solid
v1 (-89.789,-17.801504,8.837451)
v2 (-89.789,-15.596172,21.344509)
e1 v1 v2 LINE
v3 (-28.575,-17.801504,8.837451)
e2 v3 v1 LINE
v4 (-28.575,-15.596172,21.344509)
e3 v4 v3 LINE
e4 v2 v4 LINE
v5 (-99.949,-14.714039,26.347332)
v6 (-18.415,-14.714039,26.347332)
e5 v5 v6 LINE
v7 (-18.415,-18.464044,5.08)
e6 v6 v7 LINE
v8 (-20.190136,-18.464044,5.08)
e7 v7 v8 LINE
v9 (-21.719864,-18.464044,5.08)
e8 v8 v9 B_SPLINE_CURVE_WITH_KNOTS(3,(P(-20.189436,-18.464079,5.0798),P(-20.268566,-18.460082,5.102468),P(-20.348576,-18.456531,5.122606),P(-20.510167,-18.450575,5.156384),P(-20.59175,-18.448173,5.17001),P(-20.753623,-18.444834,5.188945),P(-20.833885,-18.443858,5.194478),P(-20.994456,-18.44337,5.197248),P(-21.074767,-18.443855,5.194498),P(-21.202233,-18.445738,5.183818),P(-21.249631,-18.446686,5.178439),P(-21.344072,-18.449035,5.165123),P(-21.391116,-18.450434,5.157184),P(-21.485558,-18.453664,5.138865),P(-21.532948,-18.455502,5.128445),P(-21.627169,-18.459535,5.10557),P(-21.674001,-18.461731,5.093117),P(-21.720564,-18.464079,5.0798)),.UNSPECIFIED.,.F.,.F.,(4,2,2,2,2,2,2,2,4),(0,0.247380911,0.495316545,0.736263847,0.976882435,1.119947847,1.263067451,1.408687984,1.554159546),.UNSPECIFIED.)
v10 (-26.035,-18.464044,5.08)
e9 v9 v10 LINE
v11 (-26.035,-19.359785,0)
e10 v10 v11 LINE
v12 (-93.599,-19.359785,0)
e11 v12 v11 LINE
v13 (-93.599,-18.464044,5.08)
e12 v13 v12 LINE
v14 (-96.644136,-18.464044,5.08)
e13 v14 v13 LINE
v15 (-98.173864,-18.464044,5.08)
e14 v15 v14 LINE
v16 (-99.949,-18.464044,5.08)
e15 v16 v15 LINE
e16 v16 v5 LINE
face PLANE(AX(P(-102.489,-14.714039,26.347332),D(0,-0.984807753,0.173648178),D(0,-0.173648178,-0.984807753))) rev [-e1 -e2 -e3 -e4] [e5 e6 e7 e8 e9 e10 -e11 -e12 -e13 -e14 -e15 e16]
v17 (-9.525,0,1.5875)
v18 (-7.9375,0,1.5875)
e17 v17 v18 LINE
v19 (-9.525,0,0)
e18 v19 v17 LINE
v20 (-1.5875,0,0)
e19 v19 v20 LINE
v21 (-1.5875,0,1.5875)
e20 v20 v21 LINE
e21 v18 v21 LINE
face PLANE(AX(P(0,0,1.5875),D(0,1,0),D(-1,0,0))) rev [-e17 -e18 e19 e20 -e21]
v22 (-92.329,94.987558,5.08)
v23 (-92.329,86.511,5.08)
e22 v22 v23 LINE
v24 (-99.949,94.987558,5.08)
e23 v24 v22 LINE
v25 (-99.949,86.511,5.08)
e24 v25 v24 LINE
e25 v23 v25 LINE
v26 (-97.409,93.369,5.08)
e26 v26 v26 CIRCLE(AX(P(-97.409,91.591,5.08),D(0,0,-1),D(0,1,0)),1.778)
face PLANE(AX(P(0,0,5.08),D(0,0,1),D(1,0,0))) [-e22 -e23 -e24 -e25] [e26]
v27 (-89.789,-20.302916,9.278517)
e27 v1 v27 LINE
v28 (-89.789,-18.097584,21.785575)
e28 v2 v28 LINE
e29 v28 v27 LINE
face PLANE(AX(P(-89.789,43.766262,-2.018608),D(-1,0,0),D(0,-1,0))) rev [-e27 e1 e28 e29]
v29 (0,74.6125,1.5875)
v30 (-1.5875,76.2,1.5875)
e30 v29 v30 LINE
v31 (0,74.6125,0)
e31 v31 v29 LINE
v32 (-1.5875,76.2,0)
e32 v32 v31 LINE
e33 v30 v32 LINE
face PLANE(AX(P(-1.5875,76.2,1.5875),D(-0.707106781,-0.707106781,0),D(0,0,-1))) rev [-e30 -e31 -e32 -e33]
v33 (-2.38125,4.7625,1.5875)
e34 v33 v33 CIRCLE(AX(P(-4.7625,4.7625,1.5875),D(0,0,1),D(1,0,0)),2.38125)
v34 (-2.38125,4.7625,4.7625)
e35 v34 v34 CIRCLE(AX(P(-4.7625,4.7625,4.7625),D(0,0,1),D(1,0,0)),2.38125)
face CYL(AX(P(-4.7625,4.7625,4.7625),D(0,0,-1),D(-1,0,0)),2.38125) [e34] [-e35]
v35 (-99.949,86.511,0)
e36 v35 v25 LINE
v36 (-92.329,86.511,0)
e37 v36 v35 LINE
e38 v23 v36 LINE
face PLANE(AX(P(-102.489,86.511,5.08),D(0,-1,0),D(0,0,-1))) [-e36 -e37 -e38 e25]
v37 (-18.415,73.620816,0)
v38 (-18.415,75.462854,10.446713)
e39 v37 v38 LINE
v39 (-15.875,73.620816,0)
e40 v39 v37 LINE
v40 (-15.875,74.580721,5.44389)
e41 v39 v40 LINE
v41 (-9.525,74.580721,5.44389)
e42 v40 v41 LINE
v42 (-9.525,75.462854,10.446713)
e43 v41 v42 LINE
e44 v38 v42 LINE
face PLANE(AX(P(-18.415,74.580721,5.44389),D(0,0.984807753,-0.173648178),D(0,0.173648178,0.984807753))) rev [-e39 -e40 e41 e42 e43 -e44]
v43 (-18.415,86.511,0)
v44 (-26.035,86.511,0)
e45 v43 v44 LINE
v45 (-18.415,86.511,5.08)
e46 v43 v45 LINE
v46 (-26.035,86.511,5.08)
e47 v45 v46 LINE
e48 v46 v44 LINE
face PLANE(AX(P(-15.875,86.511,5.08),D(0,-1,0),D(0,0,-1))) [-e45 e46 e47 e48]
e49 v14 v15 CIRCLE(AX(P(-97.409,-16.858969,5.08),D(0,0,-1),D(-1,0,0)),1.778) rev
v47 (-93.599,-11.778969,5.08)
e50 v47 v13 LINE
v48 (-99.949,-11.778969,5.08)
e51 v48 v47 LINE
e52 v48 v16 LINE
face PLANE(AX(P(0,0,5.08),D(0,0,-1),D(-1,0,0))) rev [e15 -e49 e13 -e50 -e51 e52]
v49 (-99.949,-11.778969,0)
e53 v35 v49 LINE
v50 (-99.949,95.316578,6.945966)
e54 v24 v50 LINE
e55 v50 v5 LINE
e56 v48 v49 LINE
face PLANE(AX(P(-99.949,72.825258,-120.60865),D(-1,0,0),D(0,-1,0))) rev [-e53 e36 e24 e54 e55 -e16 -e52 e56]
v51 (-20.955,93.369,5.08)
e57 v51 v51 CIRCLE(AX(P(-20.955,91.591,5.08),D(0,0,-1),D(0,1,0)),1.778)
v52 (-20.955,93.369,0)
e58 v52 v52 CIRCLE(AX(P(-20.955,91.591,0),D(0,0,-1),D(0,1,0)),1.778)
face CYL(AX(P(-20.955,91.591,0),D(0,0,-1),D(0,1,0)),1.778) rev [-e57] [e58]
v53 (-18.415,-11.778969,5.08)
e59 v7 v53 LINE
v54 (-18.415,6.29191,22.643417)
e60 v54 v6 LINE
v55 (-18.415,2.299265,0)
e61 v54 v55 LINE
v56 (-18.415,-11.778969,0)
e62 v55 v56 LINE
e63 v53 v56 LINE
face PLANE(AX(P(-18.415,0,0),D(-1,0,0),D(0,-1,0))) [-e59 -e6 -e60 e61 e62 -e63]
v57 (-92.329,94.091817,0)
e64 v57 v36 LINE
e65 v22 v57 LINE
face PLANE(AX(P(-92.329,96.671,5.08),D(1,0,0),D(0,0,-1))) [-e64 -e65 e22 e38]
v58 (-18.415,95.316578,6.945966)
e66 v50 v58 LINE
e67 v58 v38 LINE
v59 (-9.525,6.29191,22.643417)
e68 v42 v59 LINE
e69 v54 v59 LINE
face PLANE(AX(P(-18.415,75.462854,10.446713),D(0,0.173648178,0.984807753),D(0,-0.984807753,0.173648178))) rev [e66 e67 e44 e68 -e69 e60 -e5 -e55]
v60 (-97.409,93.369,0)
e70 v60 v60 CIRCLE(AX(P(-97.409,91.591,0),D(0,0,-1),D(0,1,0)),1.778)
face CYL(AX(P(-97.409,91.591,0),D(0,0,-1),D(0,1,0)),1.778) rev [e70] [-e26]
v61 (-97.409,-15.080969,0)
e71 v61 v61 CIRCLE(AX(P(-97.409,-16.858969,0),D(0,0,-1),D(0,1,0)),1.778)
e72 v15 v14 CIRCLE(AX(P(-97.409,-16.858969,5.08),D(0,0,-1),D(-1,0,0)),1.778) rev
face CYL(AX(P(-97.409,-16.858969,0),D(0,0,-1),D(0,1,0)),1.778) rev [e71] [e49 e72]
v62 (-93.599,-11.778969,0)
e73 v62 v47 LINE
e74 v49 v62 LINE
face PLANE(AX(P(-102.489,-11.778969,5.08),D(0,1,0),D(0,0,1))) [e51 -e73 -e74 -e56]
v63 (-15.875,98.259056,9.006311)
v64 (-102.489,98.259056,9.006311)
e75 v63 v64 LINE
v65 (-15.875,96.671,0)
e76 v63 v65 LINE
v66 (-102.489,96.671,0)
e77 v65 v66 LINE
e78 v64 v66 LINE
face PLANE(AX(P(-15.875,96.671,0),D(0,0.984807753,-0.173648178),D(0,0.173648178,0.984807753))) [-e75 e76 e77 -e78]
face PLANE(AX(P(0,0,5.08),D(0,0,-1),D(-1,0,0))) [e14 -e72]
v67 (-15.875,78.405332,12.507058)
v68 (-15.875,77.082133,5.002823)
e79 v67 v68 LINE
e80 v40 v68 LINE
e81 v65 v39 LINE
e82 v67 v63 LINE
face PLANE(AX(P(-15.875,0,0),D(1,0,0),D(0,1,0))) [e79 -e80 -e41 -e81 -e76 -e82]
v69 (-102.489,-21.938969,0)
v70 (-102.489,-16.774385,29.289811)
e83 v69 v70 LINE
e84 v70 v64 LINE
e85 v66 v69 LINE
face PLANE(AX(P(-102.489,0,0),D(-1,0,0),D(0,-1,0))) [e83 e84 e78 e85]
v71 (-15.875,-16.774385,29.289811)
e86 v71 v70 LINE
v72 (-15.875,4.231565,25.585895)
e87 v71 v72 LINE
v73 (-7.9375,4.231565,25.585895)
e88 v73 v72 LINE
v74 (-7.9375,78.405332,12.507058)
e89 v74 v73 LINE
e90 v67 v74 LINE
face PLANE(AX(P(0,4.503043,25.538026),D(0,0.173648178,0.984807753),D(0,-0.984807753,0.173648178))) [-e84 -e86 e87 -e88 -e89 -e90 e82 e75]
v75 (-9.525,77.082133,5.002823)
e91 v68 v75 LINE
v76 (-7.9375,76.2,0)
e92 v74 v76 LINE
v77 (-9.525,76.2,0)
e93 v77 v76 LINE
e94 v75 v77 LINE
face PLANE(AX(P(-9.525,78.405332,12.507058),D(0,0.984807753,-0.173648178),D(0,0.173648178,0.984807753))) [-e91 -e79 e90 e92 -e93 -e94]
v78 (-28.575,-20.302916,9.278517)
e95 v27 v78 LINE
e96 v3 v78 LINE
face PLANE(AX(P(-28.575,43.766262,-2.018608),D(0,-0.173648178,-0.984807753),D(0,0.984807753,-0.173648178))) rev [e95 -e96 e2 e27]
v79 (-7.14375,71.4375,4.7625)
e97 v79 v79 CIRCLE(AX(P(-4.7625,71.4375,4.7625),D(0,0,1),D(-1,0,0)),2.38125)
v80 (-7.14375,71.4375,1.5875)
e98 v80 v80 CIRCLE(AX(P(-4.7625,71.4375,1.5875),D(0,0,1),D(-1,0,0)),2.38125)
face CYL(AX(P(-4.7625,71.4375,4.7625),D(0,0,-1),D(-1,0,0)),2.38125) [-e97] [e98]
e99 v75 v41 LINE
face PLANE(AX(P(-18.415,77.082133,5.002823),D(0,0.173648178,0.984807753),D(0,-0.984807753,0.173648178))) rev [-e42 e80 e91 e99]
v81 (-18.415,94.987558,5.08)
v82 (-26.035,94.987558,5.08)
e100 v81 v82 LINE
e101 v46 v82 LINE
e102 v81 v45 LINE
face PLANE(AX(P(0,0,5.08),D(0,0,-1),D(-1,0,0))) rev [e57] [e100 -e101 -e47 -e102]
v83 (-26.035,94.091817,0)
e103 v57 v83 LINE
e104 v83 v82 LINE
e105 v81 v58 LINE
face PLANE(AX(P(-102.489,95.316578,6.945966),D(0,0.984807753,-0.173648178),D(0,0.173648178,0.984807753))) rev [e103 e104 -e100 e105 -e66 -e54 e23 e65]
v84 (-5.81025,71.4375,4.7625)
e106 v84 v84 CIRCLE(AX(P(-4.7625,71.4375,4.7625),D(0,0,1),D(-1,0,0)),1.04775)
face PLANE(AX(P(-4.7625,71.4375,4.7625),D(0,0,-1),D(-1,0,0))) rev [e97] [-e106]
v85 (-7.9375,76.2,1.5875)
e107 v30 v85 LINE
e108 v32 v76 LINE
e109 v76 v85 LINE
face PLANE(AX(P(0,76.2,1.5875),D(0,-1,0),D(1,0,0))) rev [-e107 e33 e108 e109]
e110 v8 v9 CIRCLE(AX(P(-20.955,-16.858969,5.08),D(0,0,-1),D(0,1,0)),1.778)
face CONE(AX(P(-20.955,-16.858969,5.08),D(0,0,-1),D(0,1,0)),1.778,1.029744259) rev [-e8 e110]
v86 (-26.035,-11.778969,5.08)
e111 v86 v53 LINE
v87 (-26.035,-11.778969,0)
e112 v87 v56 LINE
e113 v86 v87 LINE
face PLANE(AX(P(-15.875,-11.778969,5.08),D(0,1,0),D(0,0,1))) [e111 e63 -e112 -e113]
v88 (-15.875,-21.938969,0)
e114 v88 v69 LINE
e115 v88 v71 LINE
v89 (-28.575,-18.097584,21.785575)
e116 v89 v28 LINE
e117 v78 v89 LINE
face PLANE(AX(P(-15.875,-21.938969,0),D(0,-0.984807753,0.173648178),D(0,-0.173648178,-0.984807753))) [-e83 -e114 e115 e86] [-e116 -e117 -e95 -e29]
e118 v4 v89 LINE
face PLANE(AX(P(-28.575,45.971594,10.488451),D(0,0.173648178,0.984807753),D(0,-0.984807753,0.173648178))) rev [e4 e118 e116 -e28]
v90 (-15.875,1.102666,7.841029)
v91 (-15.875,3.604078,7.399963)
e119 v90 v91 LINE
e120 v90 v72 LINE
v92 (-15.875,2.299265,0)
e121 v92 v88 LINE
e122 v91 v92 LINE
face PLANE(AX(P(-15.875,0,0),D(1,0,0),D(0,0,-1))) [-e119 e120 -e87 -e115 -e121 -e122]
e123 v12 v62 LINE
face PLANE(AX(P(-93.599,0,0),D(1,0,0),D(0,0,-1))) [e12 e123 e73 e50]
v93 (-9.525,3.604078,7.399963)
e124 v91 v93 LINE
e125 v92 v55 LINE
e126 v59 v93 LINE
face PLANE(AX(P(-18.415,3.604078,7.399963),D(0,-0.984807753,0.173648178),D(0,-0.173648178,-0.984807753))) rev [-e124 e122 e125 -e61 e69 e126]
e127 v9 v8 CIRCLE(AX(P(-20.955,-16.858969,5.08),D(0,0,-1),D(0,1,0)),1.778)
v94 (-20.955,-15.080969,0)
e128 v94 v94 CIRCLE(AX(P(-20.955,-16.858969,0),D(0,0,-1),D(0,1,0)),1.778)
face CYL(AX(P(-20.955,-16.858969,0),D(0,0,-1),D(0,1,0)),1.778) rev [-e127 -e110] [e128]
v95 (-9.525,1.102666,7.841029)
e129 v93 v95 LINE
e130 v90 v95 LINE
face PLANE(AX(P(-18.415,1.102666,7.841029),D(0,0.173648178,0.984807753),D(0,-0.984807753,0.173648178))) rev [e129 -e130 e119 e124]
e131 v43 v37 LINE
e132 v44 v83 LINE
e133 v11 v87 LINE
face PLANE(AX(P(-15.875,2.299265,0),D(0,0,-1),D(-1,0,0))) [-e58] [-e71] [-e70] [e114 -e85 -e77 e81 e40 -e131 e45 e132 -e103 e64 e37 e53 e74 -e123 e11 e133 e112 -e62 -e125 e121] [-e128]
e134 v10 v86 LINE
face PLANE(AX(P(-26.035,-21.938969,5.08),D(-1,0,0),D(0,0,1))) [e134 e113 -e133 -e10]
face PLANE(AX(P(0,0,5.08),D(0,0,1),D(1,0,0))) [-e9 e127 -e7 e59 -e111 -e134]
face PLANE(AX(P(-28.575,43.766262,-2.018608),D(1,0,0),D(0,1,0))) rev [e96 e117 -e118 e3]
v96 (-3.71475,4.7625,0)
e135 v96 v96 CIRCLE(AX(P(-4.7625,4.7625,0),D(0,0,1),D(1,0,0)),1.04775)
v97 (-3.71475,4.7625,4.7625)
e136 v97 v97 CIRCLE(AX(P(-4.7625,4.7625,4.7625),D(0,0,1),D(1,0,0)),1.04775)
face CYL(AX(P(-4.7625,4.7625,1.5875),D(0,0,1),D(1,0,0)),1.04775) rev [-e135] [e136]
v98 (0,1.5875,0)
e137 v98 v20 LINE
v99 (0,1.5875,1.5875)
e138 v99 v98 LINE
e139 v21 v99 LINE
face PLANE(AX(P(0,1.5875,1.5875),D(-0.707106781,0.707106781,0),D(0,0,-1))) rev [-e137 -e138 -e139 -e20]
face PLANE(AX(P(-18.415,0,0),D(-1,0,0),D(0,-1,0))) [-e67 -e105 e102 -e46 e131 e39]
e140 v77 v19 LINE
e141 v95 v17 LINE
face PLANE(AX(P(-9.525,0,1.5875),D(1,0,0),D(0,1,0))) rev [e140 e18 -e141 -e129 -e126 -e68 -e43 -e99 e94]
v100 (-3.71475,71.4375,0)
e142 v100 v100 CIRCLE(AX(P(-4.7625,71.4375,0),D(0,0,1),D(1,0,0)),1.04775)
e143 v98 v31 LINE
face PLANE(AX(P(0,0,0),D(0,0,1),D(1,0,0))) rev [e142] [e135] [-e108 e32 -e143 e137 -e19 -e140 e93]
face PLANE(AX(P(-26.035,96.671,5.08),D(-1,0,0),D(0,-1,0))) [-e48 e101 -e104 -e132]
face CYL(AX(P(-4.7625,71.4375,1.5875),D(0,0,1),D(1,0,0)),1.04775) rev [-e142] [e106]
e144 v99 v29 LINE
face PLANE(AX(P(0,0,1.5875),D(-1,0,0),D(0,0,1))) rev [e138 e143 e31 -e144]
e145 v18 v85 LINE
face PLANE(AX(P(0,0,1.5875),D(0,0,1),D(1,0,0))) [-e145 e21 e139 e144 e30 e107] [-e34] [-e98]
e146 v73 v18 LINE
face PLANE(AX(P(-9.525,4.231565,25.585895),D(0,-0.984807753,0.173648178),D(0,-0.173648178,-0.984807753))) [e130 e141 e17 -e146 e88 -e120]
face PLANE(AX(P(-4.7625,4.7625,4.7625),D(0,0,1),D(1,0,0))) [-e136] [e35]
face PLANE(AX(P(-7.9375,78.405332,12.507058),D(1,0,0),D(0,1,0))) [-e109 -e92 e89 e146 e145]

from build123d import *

# Parameters (mm, degrees)
SKETCH1_W                          = 9.525
SKETCH1_H                          = 76.2
BOSS_EXTRUDE1_DEPTH                = 1.5875
CHAMFER2_SIZE                      = 1.5875
F_97_0_0825_DIAMETER_HOLE1_D       = 2.0955
SKETCH5_R                          = 2.38125
SKETCH5_R_2                        = 1.04775
BOSS_EXTRUDE2_DEPTH                = 3.175
BOSS_EXTRUDE4_REACH                = 77.644
SKETCH7_W                          = 1.5875
SKETCH7_H                          = 75.318017262
BOSS_EXTRUDE4_DIRECTION_2_DEPTH    = 12.7
CUT_EXTRUDE1_DEPTH                 = 83.855524788
BOSS_EXTRUDE5_DEPTH                = 8.89
BOSS_EXTRUDE7_DEPTH                = 2.54
BOSS_EXTRUDE11_DEPTH               = 2.54
BOSS_EXTRUDE8_DEPTH                = 84.074
BOSS_EXTRUDE12_REACH               = 143.095
SKETCH18_W                         = 2.54
SKETCH18_H                         = 111.72801717
CUT_EXTRUDE2_DEPTH                 = 160.515381323
CUT_EXTRUDE2_DEPTH_BACK            = 2.54
SKETCH19_W                         = 61.214
SKETCH19_H                         = 12.7
SKETCH20_W                         = 10.16
SKETCH20_H                         = 10.16
BOSS_EXTRUDE13_DEPTH               = 5.08
CUT_EXTRUDE3_DEPTH                 = 128.89819871
CUT_EXTRUDE3_DEPTH_BACK            = 128.89819871
F_97_0_14_DIAMETER_HOLE1_OUTLINE_R = 1.778
F_97_0_14_DIAMETER_HOLE1_DEPTH     = 5.08
CUT_EXTRUDE4_DEPTH                 = 1.27


# Read off the part's stored shape, not the designer's step: #97 (0.14) Diameter Hole1
with BuildPart() as part:
    # Sketch1 → Boss-Extrude1 (new body)
    with BuildSketch(Plane.XY):
        with Locations((-4.7625, 38.1)):
            Rectangle(SKETCH1_W, SKETCH1_H)
    extrude(amount=BOSS_EXTRUDE1_DEPTH)

    # Chamfer2
    chamfer2_edges = [part.edges().sort_by_distance(p)[0] for p in [
        (0, 0, 0.79375),
        (-9.525, 0, 0.79375),
        (-9.525, 76.2, 0.79375),
        (0, 76.2, 0.79375),
    ]]
    chamfer(chamfer2_edges, length=CHAMFER2_SIZE)

    # #97 (0.0825) Diameter Hole1 (through all)
    with Locations(Plane.XY.offset(1.5875)):
        with Locations((-4.7625, 4.7625), (-4.7625, 71.4375)):
            Hole(F_97_0_0825_DIAMETER_HOLE1_D / 2)

    # Sketch5 → Boss-Extrude2 (add)
    # profile 1 of 2: a face of its own
    with BuildSketch(Plane.XY.offset(1.5875)):
        with Locations((-4.7625, 4.7625)):
            Circle(SKETCH5_R)
        with Locations((-4.7625, 4.7625)):
            Circle(SKETCH5_R_2, mode=Mode.SUBTRACT)
    # profile 2 of 2: a face of its own
    with BuildSketch(Plane.XY.offset(1.5875)):
        with Locations(Location((-4.7625, 71.4375, 0), (0, 0, 180))):
            Circle(SKETCH5_R)
        with Locations((-4.7625, 71.4375)):
            Circle(SKETCH5_R_2, mode=Mode.SUBTRACT)
    extrude(amount=BOSS_EXTRUDE2_DEPTH)

    # Boss-Extrude4: up to this face of the body (flat: up to its plane)
    boss_extrude4_end = Plane(part.part.faces().sort_by_distance((-4.7625, 38.1, 0))[0])
    # Sketch7 → Boss-Extrude4 (add, up to the picked face)
    with BuildSketch(Plane(origin=(0, 2.297711148, 13.030967461), x_dir=(-1, 0, 0), z_dir=(0, -0.1736481776669307, -0.984807753012208)), mode=Mode.PRIVATE) as boss_extrude4_sk1:
        with Locations((8.73125, 37.383342149)):
            Rectangle(SKETCH7_W, SKETCH7_H)
    boss_extrude4_tool1 = split(extrude(boss_extrude4_sk1.sketch, amount=BOSS_EXTRUDE4_REACH, mode=Mode.PRIVATE), bisect_by=boss_extrude4_end, keep=Keep.BOTH, mode=Mode.PRIVATE)
    add(boss_extrude4_tool1.solids().sort_by(Axis((-8.73125, 39.113116, 6.539418), (0, -0.1736481776669307, -0.984807753012208)))[0])

    # Sketch7 → Boss-Extrude4 direction 2 (add)
    with BuildSketch(Plane(origin=(0, 2.297711148, 13.030967461), x_dir=(-1, 0, 0), z_dir=(0, -0.1736481776669307, -0.984807753012208))):
        with Locations((8.73125, 37.383342149)):
            Rectangle(SKETCH7_W, SKETCH7_H)
    extrude(amount=-BOSS_EXTRUDE4_DIRECTION_2_DEPTH)

    # Sketch9 → Cut-Extrude1 (cut, through all)
    with BuildSketch(Plane(origin=(-7.9375, 0, 0), x_dir=(0, 0, -1), z_dir=(1, 0, 0))):
        Polygon((0, 0), (-1.5875, 0), (0, -0.279919082), align=None)
    extrude(amount=-CUT_EXTRUDE1_DEPTH, mode=Mode.SUBTRACT)

    # Sketch10 → Boss-Extrude5 (add)
    with BuildSketch(Plane.ZY.offset(9.525)):
        Polygon((25.585894906, 4.231564516), (12.507058463, 78.405331856), (5.002823385, 77.082132743), (5.443889757, 74.58072105), (10.446713142, 75.462853792), (22.643416842, 6.291909837), (7.39996286, 3.604077621), (7.841029232, 1.102665928), align=None)
    extrude(amount=BOSS_EXTRUDE5_DEPTH)

    # Sketch12 → Boss-Extrude7 (add)
    with BuildSketch(Plane.ZY.offset(18.415)):
        Polygon((25.144828535, 6.732976208), (29.28981052, -16.774384765), (0, -21.93896862), (0, 2.299264512), align=None)
    extrude(amount=-BOSS_EXTRUDE7_DEPTH)

    # Sketch17 → Boss-Extrude11 (add)
    with BuildSketch(Plane.ZY.offset(18.415)):
        Polygon((12.948124835, 75.903920164), (0, 73.620816406), (0, 96.671000496), (9.006311201, 98.259056157), align=None)
    extrude(amount=-BOSS_EXTRUDE11_DEPTH)

    # Sketch13 → Boss-Extrude8 (add)
    with BuildSketch(Plane.ZY.offset(18.415)):
        Polygon((9.006311201, 98.259056157), (0, 96.671000496), (0, 94.091816901), (6.94596588, 95.316578093), (26.347332456, -14.714039444), (0, -19.359785026), (0, -21.93896862), (29.28981052, -16.774384765), align=None)
    extrude(amount=BOSS_EXTRUDE8_DEPTH)

    # Boss-Extrude12: up to this plane
    boss_extrude12_end = Plane(origin=(-15.875, 2.299264512, 0), z_dir=(0, 0, -1))
    # Sketch18 → Boss-Extrude12 (add, up to the surface)
    with BuildSketch(Plane(origin=(0, 4.061976633, 23.036614231), x_dir=(-1, 0, 0), z_dir=(0, -0.17364817766693072, -0.9848077530122081)), mode=Mode.PRIVATE) as boss_extrude12_sk1:
        with Locations((101.219, 36.798342195)):
            Rectangle(SKETCH18_W, SKETCH18_H)
    boss_extrude12_tool1 = split(extrude(boss_extrude12_sk1.sketch, amount=BOSS_EXTRUDE12_REACH, mode=Mode.PRIVATE), bisect_by=boss_extrude12_end, keep=Keep.BOTH, mode=Mode.PRIVATE)
    add(boss_extrude12_tool1.solids().sort_by_distance((-101.219, 40.301269, 16.646649))[0])

    # Sketch19 → Cut-Extrude2 (cut, two sides: drawn at the far end of the back side and taken through both)
    with BuildSketch(Plane(origin=(0, -21.27742777, 3.751784596), x_dir=(-1, 0, 0), z_dir=(0, -0.984807753012208, 0.17364817766693108)).offset(-CUT_EXTRUDE2_DEPTH_BACK)):
        with Locations((59.182, -11.961991138)):
            Rectangle(SKETCH19_W, SKETCH19_H)
    extrude(amount=CUT_EXTRUDE2_DEPTH + CUT_EXTRUDE2_DEPTH_BACK, mode=Mode.SUBTRACT)

    # Sketch20 → Boss-Extrude13 (add)
    with BuildSketch(Plane(origin=(0, 0, 0), x_dir=(-1, 0, 0), z_dir=(0, 0, -1))):
        with Locations((97.409, -16.85896862)):
            Rectangle(SKETCH20_W, SKETCH20_H)
        with Locations((20.955, -16.85896862)):
            Rectangle(SKETCH20_W, SKETCH20_H)
        with Locations((20.955, 91.591000496)):
            Rectangle(SKETCH20_W, SKETCH20_H)
        with Locations((97.409, 91.591000496)):
            Rectangle(SKETCH20_W, SKETCH20_H)
    extrude(amount=-BOSS_EXTRUDE13_DEPTH)

    # Sketch21 → Cut-Extrude3 (cut, two sides: drawn at the far end of the back side and taken through both)
    with BuildSketch(Plane.ZY.offset(26.035).offset(-CUT_EXTRUDE3_DEPTH_BACK)):
        Polygon((0, -21.93896862), (5.08, -21.043227558), (5.08, -21.93896862), align=None)
    extrude(amount=CUT_EXTRUDE3_DEPTH + CUT_EXTRUDE3_DEPTH_BACK, mode=Mode.SUBTRACT)

    # #97 (0.14) Diameter Hole1 outline → #97 (0.14) Diameter Hole1 (cut)
    with BuildSketch(Plane.XY):
        with Locations((-97.409, 91.591000496)):
            Circle(F_97_0_14_DIAMETER_HOLE1_OUTLINE_R)
        with Locations((-20.955, 91.591000496)):
            Circle(F_97_0_14_DIAMETER_HOLE1_OUTLINE_R)
        with Locations((-97.409, -16.85896862)):
            Circle(F_97_0_14_DIAMETER_HOLE1_OUTLINE_R)
    extrude(amount=F_97_0_14_DIAMETER_HOLE1_DEPTH, mode=Mode.SUBTRACT)

    # 97 _0.14_ Diameter Hole1 2 outline → 97 _0.14_ Diameter Hole1 2 (revolve, cut)
    with BuildSketch(Plane(origin=(-20.955, -16.85896862, 0), x_dir=(1, 0, 0), z_dir=(0, -1, 0))):
        Polygon((0, 0), (1.778000002, 0), (1.778, 5.08), (1.584438765, 5.196303323), (0, 5.196303323), align=None)
    revolve(axis=Axis((-20.955, -16.85896862, 0), (0, 0, 1)), mode=Mode.SUBTRACT)

    # Sketch24 → Cut-Extrude4 (cut)
    with BuildSketch(Plane(origin=(-92.329, 0, 0), x_dir=(0, 0, -1), z_dir=(1, 0, 0))):
        Polygon((0, -19.359785026), (-5.08, -18.464043964), (-5.08, -11.77896862), (0, -11.77896862), align=None)
    extrude(amount=-CUT_EXTRUDE4_DEPTH, mode=Mode.SUBTRACT)


solid = part.part
